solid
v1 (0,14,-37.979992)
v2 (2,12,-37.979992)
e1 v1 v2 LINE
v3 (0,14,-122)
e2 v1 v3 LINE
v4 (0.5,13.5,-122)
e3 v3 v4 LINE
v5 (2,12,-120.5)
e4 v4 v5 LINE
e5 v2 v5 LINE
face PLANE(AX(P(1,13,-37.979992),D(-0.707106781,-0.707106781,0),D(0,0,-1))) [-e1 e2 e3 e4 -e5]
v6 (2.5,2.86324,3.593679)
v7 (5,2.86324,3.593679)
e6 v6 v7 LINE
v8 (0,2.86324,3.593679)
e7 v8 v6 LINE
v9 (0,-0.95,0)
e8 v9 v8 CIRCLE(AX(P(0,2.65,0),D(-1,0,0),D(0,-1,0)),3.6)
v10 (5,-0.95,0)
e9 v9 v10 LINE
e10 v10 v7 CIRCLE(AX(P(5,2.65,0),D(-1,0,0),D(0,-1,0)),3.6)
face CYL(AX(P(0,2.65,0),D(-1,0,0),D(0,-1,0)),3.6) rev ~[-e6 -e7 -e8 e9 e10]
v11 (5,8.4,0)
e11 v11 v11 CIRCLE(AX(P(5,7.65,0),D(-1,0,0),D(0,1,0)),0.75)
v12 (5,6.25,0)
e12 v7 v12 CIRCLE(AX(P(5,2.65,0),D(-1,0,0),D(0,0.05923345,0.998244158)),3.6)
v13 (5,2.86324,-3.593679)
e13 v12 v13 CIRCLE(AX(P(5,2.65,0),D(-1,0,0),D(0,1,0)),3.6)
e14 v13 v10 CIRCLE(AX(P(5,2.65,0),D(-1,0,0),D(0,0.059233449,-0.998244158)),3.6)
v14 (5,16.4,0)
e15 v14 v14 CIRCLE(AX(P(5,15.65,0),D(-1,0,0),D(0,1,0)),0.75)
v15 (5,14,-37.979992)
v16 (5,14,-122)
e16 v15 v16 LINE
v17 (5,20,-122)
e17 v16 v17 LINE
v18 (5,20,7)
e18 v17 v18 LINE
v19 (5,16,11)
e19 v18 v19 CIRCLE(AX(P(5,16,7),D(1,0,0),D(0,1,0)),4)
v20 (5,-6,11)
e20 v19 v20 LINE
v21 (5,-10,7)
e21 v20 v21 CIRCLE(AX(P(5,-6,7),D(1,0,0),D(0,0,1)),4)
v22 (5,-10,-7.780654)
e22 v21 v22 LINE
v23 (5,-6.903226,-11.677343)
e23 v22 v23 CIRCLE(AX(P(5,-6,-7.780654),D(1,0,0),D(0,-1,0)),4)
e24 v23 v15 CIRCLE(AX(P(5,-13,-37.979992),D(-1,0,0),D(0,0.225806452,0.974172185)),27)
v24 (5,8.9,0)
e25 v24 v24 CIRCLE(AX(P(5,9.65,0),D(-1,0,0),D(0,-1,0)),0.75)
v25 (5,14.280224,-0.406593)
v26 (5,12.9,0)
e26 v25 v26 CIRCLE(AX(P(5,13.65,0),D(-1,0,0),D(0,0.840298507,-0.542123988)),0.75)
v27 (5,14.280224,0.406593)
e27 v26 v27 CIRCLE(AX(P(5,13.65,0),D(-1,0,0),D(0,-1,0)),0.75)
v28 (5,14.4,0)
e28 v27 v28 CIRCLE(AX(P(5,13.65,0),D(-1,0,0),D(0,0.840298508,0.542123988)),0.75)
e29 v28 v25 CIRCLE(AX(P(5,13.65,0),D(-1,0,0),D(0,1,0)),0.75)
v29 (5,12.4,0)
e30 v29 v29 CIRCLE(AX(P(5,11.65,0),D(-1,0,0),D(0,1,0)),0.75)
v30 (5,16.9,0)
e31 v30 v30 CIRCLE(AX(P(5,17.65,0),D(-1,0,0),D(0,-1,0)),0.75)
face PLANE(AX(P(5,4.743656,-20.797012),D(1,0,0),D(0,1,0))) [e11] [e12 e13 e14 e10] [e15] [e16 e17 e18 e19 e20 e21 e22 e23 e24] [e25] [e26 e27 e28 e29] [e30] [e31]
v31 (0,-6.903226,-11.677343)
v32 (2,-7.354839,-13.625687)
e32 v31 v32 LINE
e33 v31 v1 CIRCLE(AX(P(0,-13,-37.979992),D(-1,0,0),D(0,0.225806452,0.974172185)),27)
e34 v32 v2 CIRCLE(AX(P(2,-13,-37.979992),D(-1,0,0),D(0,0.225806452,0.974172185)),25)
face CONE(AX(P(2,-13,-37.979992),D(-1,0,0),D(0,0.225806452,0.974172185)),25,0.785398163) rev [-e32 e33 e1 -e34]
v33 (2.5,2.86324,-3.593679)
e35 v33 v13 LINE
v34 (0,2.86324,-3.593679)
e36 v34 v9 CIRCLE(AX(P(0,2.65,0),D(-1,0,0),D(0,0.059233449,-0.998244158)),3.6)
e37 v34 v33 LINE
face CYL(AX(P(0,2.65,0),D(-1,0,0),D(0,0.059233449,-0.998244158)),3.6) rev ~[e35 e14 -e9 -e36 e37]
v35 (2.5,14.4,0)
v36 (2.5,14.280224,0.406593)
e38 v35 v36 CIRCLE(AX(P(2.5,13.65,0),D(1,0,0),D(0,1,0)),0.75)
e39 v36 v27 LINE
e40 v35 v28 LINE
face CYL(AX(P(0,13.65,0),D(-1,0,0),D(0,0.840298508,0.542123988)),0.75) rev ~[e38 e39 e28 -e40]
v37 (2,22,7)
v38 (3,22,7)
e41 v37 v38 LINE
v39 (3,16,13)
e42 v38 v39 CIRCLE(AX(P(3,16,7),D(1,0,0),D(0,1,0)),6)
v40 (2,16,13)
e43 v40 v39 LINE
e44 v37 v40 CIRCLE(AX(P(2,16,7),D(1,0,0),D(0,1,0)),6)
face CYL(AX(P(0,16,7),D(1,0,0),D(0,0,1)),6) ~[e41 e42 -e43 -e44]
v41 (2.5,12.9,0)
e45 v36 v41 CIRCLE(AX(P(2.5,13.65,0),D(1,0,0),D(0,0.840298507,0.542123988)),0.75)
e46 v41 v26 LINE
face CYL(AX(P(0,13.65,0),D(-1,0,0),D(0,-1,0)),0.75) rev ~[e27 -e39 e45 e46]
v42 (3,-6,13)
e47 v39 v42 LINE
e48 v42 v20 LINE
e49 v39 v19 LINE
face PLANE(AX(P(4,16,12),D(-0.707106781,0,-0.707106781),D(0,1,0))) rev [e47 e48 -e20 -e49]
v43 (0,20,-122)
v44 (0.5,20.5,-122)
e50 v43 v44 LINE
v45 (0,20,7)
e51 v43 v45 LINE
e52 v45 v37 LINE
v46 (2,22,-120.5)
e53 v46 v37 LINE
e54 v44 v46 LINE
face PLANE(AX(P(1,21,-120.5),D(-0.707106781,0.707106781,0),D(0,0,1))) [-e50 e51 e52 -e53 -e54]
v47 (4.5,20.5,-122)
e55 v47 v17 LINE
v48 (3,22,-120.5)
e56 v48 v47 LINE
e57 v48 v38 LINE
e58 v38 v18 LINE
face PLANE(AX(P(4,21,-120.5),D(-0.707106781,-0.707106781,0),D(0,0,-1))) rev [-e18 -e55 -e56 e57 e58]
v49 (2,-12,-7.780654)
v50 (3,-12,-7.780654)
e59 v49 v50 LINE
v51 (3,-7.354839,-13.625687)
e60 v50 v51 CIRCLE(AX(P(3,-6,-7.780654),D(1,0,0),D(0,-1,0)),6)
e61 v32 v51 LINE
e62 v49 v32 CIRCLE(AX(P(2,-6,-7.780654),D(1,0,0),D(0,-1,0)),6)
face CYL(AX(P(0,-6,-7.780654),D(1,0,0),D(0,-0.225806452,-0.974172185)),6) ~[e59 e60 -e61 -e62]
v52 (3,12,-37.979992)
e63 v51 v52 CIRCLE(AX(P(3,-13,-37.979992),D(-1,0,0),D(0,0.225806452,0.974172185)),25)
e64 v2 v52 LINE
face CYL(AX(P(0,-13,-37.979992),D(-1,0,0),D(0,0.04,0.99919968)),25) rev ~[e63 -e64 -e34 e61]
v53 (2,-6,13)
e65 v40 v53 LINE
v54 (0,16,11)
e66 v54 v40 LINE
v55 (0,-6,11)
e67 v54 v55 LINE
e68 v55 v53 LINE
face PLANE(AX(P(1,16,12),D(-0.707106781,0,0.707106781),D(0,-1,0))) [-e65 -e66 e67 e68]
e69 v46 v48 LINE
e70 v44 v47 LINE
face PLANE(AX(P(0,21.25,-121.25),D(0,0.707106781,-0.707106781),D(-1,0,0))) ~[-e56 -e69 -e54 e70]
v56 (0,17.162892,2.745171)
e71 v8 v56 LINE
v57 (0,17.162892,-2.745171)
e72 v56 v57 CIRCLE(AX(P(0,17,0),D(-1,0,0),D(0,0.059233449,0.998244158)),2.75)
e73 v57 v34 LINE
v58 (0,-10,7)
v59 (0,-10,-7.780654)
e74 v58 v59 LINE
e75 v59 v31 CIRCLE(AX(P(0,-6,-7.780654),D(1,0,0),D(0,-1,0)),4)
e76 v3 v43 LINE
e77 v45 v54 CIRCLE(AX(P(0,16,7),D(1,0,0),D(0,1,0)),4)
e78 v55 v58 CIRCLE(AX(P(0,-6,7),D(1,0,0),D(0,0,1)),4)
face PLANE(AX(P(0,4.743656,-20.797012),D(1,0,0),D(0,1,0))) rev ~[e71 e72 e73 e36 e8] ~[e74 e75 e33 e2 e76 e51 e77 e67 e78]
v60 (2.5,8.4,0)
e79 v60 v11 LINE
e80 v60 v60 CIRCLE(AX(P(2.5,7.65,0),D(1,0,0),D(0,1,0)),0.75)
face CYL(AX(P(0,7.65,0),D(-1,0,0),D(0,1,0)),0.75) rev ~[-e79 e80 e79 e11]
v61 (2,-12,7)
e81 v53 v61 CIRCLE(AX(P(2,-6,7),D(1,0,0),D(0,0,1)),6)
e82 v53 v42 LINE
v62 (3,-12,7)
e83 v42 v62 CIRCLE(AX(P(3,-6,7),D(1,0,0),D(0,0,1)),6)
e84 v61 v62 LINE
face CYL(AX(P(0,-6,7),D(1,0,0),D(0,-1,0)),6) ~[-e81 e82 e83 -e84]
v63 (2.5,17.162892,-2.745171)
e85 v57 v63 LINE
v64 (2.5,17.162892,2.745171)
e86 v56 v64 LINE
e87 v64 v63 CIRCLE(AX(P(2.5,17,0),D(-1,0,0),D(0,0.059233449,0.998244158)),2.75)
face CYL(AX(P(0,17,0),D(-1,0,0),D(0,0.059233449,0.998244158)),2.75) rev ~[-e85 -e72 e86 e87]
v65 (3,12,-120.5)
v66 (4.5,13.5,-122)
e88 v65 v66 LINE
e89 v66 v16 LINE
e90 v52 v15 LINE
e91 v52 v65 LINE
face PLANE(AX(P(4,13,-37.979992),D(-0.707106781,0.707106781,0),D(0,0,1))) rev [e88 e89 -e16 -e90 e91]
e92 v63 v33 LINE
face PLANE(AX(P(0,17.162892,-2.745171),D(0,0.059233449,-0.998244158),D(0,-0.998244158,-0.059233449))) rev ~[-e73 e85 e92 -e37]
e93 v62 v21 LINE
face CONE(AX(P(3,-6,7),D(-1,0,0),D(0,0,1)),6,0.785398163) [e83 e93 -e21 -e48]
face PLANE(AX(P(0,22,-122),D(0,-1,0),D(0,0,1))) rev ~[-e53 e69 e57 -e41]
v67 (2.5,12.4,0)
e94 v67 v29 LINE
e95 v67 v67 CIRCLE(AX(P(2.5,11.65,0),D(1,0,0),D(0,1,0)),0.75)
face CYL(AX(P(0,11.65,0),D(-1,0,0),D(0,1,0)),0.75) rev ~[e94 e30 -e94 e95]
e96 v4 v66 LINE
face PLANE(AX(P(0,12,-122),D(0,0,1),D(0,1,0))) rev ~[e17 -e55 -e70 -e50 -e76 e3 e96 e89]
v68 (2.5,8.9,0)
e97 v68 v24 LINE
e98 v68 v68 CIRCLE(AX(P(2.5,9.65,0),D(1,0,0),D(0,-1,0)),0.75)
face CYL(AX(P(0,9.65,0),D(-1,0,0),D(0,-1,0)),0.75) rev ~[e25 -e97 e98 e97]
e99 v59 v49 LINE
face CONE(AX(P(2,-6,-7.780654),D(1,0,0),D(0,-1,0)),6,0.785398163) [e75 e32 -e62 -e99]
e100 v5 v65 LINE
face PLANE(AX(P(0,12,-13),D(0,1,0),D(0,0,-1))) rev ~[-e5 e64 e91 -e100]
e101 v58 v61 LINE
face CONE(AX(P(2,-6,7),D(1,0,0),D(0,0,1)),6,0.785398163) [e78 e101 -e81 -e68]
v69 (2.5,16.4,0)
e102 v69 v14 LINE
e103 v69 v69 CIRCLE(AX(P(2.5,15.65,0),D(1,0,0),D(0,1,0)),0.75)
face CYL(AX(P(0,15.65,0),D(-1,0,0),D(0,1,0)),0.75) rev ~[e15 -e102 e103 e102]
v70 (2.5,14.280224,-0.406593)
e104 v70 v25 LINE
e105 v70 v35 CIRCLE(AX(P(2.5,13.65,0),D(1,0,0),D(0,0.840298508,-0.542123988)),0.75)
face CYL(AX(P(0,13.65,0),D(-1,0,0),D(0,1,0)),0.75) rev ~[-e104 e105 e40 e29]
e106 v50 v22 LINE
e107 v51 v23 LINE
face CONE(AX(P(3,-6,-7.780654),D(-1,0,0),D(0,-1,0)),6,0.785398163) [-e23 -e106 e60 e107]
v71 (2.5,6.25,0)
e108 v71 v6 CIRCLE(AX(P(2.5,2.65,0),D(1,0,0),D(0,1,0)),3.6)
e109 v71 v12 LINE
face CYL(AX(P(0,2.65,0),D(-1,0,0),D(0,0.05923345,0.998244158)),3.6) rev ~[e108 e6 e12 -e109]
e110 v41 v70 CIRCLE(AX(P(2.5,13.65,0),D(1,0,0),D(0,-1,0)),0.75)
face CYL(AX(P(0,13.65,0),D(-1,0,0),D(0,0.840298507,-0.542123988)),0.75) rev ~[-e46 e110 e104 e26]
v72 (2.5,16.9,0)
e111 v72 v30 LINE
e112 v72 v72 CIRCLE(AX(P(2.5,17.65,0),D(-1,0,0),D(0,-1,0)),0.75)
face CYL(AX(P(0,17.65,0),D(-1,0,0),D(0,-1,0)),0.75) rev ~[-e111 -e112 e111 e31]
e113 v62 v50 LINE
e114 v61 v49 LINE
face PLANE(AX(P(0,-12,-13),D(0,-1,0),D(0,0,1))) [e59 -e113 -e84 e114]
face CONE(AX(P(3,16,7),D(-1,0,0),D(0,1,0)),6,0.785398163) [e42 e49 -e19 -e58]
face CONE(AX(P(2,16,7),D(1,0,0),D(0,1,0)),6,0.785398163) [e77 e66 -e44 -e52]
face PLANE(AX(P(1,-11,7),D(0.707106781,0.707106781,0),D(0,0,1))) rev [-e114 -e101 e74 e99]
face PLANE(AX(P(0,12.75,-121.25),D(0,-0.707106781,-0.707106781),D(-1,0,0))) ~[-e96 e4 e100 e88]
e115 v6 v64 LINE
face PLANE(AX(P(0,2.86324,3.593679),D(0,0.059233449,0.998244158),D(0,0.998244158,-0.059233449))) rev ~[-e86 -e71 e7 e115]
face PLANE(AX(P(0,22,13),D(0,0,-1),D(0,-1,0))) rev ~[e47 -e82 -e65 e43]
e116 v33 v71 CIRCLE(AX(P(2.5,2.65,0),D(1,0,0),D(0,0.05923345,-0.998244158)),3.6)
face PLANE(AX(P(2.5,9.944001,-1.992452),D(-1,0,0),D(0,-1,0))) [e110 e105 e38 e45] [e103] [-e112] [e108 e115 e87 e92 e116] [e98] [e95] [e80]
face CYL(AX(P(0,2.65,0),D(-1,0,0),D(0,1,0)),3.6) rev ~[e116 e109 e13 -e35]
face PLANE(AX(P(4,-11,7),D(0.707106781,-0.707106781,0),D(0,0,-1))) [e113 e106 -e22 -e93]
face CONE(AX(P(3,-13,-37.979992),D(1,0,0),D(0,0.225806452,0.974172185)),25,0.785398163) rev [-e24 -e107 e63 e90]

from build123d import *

# Parameters (mm, degrees)
F0_W        = 24
F0_H        = 26
F1_DEPTH    = 5
F2_T1_DEPTH = 5
F3_SIZE     = 1.5
F4_R        = 6
F5_SIZE     = 2
F6_R        = 0.75
F7_DEPTH    = 5
F8_DEPTH    = 2.5


# Not quite as in the source:
# - a fillet or chamfer that OpenCascade refuses, or shapes differently, is made with other operations: its cross-section is extruded or revolved along the edge and cut away or added


with BuildPart() as f1:
    # F0 (on Right) → F1 (new body)
    with BuildSketch(Plane.YZ):
        Rectangle(F0_W, F0_H)
        Polygon((22, 13), (12, 13), (12, -13), (12, -122), (22, -122), align=None)
    extrude(amount=F1_DEPTH)

    # F2: fillet of radius 25 on 1 edges, made by hand

    # F2_s2 → F2_t1 (join)
    with BuildSketch(Plane.YZ):
        with BuildLine():
            ThreePointArc((-12, -13), (5.0277563773, -20.6594839179), (12, -37.9799919936))
            Line((12, -37.9799919936), (12, -13))
            Line((12, -13), (-12, -13))
        make_face()
    extrude(amount=F2_T1_DEPTH)

    # F3
    f3_edges = [f1.edges().sort_by_distance(p)[0] for p in [
        (2.5, 12, -122),
        (2.5, 22, -122),
    ]]
    chamfer(f3_edges, length=F3_SIZE)

    # F4
    f4_edges = [f1.edges().sort_by_distance(p)[0] for p in [
        (2.5, -12, -13),
        (2.5, -12, 13),
        (2.5, 22, 13),
    ]]
    fillet(f4_edges, radius=F4_R)

    # F5
    f5_edges = [f1.edges().sort_by_distance(p)[0] for p in [
        (5, 22, -56.75),
        (0, 22, -56.75),
        (0, 6.572034, -22.425717),
        (0, -10.697288, -11.51368),
        (0, 12, -79.239996),
        (0, -12, -0.390327),
        (0, -10.242641, 11.242641),
        (0, 5, 13),
        (0, 20.242641, 11.242641),
        (5, 6.572034, -22.425717),
        (5, -10.697288, -11.51368),
        (5, 12, -79.239996),
        (5, -12, -0.390327),
        (5, -10.242641, 11.242641),
        (5, 5, 13),
        (5, 20.242641, 11.242641),
    ]]
    chamfer(f5_edges, length=F5_SIZE)

    # F6 (on face) → F7 (cut)
    with BuildSketch(Plane(origin=(0, 0, 0), x_dir=(0, -1, 0), z_dir=(-1, 0, 0))):
        with BuildLine():
            ThreePointArc((-2.8632404181, 3.5936789679), (-5.2698917444, 2.469041767), (-6.25, 0))
            ThreePointArc((-6.25, 0), (-5.2698917444, -2.469041767), (-2.8632404181, -3.5936789679))
            ThreePointArc((-2.8632404181, -3.5936789679), (-0.180958233, -2.6198917444), (0.95, 0))
            ThreePointArc((0.95, 0), (-0.180958233, 2.6198917444), (-2.8632404181, 3.5936789679))
        make_face()
        with BuildLine():
            ThreePointArc((-5.25, 0), (-2.65, 2.6), (-0.05, 0))
            ThreePointArc((-0.05, 0), (-2.65, -2.6), (-5.25, 0))
        make_face(mode=Mode.SUBTRACT)
        with BuildLine():
            ThreePointArc((-5.25, 0), (-2.65, -2.6), (-0.05, 0))
            ThreePointArc((-0.05, 0), (-2.65, 2.6), (-5.25, 0))
        make_face()
        with Locations((-17.65, 0)):
            Circle(F6_R)
        with BuildLine():
            Line((-16.4, 0), (-14.9, 0))
            ThreePointArc((-14.9, 0), (-15.65, 0.75), (-16.4, 0))
        make_face()
        with BuildLine():
            ThreePointArc((-16.4, 0), (-15.65, -0.75), (-14.9, 0))
            Line((-14.9, 0), (-16.4, 0))
        make_face()
        with BuildLine():
            ThreePointArc((-10.9, 0), (-11.65, 0.75), (-12.4, 0))
            Line((-12.4, 0), (-10.9, 0))
        make_face()
        with BuildLine():
            Line((-10.9, 0), (-12.4, 0))
            ThreePointArc((-12.4, 0), (-11.65, -0.75), (-10.9, 0))
        make_face()
        with BuildLine():
            ThreePointArc((-10.4, 0), (-9.65, -0.75), (-8.9, 0))
            Line((-8.9, 0), (-10.4, 0))
        make_face()
        with BuildLine():
            Line((-10.4, 0), (-8.9, 0))
            ThreePointArc((-8.9, 0), (-9.65, 0.75), (-10.4, 0))
        make_face()
        with BuildLine():
            Line((-8.4, 0), (-6.9, 0))
            ThreePointArc((-6.9, 0), (-7.65, 0.75), (-8.4, 0))
        make_face()
        with BuildLine():
            ThreePointArc((-8.4, 0), (-7.65, -0.75), (-6.9, 0))
            Line((-6.9, 0), (-8.4, 0))
        make_face()
        with BuildLine():
            ThreePointArc((-12.9, 0), (-13.4380659424, 0.719433079), (-14.2802238806, 0.406592991))
            ThreePointArc((-14.2802238806, 0.406592991), (-14.2575663793, 0.2038573909), (-14.25, 0))
            Line((-14.25, 0), (-12.9, 0))
        make_face()
        with BuildLine():
            ThreePointArc((-14.25, 0), (-14.2575663793, -0.2038573909), (-14.2802238806, -0.406592991))
            ThreePointArc((-14.2802238806, -0.406592991), (-13.4380659424, -0.719433079), (-12.9, 0))
            Line((-12.9, 0), (-14.25, 0))
        make_face()
        with BuildLine():
            ThreePointArc((-14.4, 0), (-14.369433079, -0.2119340576), (-14.2802238806, -0.406592991))
            ThreePointArc((-14.2802238806, -0.406592991), (-14.2575663793, -0.2038573909), (-14.25, 0))
            Line((-14.25, 0), (-14.4, 0))
        make_face()
        with BuildLine():
            ThreePointArc((-14.25, 0), (-14.2575663793, 0.2038573909), (-14.2802238806, 0.406592991))
            ThreePointArc((-14.2802238806, 0.406592991), (-14.369433079, 0.2119340576), (-14.4, 0))
            Line((-14.4, 0), (-14.25, 0))
        make_face()
    extrude(amount=-F7_DEPTH, mode=Mode.SUBTRACT)

    # F6 (on face) → F8 (cut)
    with BuildSketch(Plane(origin=(0, 0, 0), x_dir=(0, -1, 0), z_dir=(-1, 0, 0))):
        with BuildLine():
            ThreePointArc((-2.8632404181, -3.5936789679), (-5.2698917444, -2.469041767), (-6.25, 0))
            Line((-6.25, 0), (-6.9, 0))
            ThreePointArc((-6.9, 0), (-7.65, -0.75), (-8.4, 0))
            Line((-8.4, 0), (-8.9, 0))
            ThreePointArc((-8.9, 0), (-9.65, -0.75), (-10.4, 0))
            Line((-10.4, 0), (-10.9, 0))
            ThreePointArc((-10.9, 0), (-11.65, -0.75), (-12.4, 0))
            Line((-12.4, 0), (-12.9, 0))
            ThreePointArc((-12.9, 0), (-13.4380659424, -0.719433079), (-14.2802238806, -0.406592991))
            ThreePointArc((-14.2802238806, -0.406592991), (-15.2674725396, -2.1356143376), (-17.1628919861, -2.7451714338))
            Line((-17.1628919861, -2.7451714338), (-2.8632404181, -3.5936789679))
        make_face()
        with BuildLine():
            ThreePointArc((-14.2802238806, 0.406592991), (-15.2674725396, 2.1356143376), (-17.1628919861, 2.7451714338))
            ThreePointArc((-17.1628919861, 2.7451714338), (-19.75, 0), (-17.1628919861, -2.7451714338))
            ThreePointArc((-17.1628919861, -2.7451714338), (-15.2674725396, -2.1356143376), (-14.2802238806, -0.406592991))
            ThreePointArc((-14.2802238806, -0.406592991), (-14.369433079, -0.2119340576), (-14.4, 0))
            ThreePointArc((-14.4, 0), (-14.369433079, 0.2119340576), (-14.2802238806, 0.406592991))
        make_face()
        with Locations((-17.65, 0)):
            Circle(F6_R, mode=Mode.SUBTRACT)
        with BuildLine():
            ThreePointArc((-16.4, 0), (-15.65, 0.75), (-14.9, 0))
            ThreePointArc((-14.9, 0), (-15.65, -0.75), (-16.4, 0))
        make_face(mode=Mode.SUBTRACT)
        with BuildLine():
            Line((-6.9, 0), (-6.25, 0))
            ThreePointArc((-6.25, 0), (-5.2698917444, 2.469041767), (-2.8632404181, 3.5936789679))
            Line((-2.8632404181, 3.5936789679), (-17.1628919861, 2.7451714338))
            ThreePointArc((-17.1628919861, 2.7451714338), (-15.2674725396, 2.1356143376), (-14.2802238806, 0.406592991))
            ThreePointArc((-14.2802238806, 0.406592991), (-13.4380659424, 0.719433079), (-12.9, 0))
            Line((-12.9, 0), (-12.4, 0))
            ThreePointArc((-12.4, 0), (-11.65, 0.75), (-10.9, 0))
            Line((-10.9, 0), (-10.4, 0))
            ThreePointArc((-10.4, 0), (-9.65, 0.75), (-8.9, 0))
            Line((-8.9, 0), (-8.4, 0))
            ThreePointArc((-8.4, 0), (-7.65, 0.75), (-6.9, 0))
        make_face()
    extrude(amount=-F8_DEPTH, mode=Mode.SUBTRACT)


solid = f1.part
